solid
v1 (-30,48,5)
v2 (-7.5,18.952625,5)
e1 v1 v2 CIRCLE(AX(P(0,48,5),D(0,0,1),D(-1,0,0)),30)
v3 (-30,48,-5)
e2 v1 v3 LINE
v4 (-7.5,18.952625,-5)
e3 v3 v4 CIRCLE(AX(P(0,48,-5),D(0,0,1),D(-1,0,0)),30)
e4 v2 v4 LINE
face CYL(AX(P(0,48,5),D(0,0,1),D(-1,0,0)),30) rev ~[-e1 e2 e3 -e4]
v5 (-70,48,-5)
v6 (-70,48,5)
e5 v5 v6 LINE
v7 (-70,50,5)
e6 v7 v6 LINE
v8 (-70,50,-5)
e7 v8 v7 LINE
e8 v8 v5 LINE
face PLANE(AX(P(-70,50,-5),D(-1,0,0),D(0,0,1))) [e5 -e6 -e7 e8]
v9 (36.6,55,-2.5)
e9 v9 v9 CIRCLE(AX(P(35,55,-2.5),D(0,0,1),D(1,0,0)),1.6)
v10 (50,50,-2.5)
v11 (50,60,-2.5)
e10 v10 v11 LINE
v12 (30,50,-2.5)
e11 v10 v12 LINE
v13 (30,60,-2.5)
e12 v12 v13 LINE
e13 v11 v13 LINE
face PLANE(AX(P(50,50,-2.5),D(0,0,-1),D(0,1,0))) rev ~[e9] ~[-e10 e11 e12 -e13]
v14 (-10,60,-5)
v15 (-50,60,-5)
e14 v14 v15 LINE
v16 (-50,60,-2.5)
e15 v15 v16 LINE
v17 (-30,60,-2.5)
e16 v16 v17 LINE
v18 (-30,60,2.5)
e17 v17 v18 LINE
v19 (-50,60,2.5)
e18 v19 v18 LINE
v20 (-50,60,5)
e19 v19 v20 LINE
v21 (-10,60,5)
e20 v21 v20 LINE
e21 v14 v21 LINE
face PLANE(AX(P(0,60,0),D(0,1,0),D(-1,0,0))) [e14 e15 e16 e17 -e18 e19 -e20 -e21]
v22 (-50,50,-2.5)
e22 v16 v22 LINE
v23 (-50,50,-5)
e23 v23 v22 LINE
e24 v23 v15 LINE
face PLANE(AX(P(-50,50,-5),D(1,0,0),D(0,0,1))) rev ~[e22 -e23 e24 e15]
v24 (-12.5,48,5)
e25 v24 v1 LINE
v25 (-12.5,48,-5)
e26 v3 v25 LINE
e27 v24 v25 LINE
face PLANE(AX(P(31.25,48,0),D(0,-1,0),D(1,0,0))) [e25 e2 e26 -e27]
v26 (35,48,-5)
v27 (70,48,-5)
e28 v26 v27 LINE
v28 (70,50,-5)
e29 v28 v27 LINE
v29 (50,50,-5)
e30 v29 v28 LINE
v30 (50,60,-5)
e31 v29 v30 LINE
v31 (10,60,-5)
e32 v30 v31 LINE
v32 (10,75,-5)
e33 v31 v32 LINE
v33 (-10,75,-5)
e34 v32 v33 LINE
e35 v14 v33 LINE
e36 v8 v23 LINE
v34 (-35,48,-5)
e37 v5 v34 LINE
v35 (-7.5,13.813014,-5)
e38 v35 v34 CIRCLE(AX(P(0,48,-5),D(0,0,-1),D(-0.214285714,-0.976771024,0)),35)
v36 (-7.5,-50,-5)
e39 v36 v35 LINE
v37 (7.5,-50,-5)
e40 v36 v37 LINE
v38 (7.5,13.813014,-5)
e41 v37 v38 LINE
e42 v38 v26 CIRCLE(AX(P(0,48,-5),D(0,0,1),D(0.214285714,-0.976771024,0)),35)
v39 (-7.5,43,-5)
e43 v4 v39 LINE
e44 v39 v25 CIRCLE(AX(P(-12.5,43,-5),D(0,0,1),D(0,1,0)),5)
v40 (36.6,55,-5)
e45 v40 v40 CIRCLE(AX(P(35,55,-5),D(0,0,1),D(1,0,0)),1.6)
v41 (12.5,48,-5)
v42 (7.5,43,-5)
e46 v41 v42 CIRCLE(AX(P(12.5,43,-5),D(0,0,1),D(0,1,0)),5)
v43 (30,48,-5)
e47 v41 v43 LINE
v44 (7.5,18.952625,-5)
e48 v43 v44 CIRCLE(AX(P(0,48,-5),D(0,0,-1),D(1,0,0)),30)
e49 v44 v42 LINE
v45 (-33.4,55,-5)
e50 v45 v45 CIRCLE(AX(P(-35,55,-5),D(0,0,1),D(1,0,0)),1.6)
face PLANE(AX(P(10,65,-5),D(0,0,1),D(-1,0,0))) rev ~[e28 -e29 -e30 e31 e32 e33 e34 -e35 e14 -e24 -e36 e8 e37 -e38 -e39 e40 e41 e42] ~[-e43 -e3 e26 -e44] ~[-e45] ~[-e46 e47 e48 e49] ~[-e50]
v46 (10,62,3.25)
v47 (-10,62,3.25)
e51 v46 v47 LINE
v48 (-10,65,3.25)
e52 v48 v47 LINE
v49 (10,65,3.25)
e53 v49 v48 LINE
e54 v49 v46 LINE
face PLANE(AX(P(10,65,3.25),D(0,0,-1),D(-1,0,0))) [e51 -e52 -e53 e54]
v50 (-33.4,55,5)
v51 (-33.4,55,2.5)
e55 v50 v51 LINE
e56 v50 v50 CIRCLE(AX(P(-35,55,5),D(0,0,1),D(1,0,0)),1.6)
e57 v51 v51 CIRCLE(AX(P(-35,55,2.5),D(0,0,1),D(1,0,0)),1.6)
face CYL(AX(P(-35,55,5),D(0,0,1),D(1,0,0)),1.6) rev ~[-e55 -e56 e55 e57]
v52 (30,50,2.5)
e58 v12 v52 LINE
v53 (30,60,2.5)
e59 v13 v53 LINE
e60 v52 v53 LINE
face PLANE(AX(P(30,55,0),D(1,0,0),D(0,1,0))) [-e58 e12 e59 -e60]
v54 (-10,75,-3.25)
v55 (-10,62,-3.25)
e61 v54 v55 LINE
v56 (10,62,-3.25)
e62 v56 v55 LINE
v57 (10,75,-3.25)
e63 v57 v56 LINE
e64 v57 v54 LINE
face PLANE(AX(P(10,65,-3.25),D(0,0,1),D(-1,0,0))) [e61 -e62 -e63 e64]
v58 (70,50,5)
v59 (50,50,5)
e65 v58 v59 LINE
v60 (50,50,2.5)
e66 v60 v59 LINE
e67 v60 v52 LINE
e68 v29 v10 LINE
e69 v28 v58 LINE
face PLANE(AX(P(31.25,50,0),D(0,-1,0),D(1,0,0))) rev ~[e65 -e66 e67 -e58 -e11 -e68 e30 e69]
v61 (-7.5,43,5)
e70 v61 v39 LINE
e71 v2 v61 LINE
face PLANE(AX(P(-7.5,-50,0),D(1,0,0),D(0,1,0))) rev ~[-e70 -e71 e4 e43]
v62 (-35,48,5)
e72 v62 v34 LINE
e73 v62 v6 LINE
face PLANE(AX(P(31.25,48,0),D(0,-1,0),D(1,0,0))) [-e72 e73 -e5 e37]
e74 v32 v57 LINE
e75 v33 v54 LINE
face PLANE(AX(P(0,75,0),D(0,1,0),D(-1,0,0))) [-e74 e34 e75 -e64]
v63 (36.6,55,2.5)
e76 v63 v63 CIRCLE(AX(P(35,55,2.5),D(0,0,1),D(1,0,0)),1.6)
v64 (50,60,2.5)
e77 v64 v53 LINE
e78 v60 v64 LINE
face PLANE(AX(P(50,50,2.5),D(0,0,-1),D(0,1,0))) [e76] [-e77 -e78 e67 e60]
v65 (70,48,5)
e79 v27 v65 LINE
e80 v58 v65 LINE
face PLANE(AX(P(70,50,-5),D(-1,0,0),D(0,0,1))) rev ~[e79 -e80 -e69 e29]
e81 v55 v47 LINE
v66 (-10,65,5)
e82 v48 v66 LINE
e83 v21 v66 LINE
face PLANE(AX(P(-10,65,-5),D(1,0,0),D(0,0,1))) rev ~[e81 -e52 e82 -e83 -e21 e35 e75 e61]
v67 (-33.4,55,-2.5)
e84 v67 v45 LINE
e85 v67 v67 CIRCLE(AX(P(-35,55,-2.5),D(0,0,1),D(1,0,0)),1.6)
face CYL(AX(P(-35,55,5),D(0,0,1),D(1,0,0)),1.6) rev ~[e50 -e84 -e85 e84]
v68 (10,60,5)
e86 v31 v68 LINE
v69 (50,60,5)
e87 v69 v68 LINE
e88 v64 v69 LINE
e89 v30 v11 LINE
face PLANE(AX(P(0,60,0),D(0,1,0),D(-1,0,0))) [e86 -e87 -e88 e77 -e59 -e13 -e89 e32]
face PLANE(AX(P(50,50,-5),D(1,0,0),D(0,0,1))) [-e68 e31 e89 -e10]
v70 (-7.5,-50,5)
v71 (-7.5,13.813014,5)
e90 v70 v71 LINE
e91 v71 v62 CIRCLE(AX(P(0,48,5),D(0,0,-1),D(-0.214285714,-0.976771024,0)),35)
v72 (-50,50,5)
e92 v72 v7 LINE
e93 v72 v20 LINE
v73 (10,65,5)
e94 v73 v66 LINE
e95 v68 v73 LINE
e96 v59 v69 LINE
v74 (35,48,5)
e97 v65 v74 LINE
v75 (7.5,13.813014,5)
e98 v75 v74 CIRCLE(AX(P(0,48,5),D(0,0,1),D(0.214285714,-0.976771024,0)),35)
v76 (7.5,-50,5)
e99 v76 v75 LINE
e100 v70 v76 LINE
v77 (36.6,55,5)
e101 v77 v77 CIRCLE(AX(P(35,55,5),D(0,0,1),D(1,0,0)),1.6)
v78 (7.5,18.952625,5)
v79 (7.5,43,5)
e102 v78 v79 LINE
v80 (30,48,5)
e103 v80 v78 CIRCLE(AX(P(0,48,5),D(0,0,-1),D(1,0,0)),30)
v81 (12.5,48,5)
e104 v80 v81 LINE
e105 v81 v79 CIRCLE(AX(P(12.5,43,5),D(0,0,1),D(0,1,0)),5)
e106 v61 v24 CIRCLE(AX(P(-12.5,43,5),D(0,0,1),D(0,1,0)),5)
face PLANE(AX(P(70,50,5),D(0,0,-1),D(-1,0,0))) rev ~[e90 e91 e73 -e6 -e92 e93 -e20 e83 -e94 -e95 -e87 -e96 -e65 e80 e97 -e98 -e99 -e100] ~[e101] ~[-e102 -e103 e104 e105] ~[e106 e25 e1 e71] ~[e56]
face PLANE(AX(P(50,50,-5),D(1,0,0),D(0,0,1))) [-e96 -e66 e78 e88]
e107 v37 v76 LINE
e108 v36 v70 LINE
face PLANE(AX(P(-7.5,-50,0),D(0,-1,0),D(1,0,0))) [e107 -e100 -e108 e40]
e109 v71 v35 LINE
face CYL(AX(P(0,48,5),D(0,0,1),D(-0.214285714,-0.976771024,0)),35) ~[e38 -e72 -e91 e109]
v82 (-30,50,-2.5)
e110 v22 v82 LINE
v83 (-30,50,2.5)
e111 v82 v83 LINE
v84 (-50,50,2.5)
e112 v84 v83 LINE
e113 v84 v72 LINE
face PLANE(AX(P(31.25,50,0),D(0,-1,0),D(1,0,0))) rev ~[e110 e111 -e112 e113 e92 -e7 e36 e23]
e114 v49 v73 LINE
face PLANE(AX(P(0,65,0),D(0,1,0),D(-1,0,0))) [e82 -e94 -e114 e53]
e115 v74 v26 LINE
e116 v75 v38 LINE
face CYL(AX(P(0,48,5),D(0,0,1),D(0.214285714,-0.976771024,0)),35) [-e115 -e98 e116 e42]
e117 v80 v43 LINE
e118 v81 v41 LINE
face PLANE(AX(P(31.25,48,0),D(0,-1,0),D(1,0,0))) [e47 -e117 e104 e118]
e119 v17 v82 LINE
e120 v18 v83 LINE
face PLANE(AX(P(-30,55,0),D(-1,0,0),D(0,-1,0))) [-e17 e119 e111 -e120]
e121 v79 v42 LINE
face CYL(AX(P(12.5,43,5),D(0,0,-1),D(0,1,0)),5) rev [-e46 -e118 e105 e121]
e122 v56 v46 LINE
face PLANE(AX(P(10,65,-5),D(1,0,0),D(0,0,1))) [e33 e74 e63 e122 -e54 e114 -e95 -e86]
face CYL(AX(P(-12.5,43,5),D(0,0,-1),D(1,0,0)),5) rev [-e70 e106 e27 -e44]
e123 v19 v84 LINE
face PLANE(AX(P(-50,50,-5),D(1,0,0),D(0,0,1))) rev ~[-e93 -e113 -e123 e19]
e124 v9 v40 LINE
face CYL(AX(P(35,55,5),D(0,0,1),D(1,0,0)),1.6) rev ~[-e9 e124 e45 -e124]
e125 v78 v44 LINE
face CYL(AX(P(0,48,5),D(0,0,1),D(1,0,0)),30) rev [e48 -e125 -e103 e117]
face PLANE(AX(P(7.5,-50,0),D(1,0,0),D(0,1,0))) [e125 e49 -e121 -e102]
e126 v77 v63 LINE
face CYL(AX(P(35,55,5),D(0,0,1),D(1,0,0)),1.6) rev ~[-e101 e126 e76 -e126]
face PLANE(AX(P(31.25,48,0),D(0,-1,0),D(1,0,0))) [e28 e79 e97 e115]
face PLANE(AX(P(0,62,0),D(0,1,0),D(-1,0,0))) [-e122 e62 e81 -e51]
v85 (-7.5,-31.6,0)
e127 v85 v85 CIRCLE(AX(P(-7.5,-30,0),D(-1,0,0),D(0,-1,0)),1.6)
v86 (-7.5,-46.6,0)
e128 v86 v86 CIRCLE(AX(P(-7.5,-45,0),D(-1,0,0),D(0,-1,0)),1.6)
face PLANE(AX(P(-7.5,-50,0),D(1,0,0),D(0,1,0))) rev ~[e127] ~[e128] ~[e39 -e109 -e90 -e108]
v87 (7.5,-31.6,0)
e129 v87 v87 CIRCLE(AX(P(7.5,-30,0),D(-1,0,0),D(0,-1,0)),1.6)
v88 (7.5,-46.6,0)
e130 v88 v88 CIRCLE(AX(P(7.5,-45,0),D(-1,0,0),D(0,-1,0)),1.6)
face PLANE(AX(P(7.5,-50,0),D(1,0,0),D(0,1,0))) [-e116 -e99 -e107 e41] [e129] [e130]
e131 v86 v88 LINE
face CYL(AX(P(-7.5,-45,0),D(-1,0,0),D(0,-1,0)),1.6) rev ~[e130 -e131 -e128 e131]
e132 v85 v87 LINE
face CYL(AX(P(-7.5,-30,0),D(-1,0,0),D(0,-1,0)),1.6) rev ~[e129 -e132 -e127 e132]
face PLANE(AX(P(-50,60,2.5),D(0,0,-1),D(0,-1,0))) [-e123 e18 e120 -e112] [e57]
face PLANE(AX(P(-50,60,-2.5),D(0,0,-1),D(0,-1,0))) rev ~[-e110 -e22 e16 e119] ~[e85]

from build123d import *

# Parameters (mm, degrees)
F0_W      = 15
F0_H      = 100
F1_DEPTH  = 5
F2_W      = 100
F2_H      = 10
F3_DEPTH  = 10
F4_W      = 10
F4_H      = 5
F5_DEPTH  = 20
F6_W      = 10
F6_H      = 5
F7_DEPTH  = 20
F8_R      = 1.6
F9_DEPTH  = 10
F10_W     = 77.5
F10_H     = 10
F10_W_2   = 140
F11_DEPTH = 2
F12_R     = 5
F13_R     = 1.6
F14_DEPTH = 15
F15_W     = 20
F15_H     = 10
F16_DEPTH = 5
F17_W     = 20
F17_H     = 6.5
F18_DEPTH = 3
F19_DEPTH = 10
F21_DEPTH = 10


# Not quite as in the source:
# - a pattern or mirror of a feature is missing from the dataset's text; its kind, count and spacing are read off the source's solid


with BuildPart() as f1:
    # F0 (on Top) → F1 (new body, symmetric)
    with BuildSketch(Plane.XY):
        Rectangle(F0_W, F0_H)
    extrude(amount=F1_DEPTH, both=True)

    # F2 (on face) → F3 (join)
    with BuildSketch(Plane(origin=(0, 50, 0), x_dir=(-1, 0, 0), z_dir=(0, 1, 0))):
        Rectangle(F2_W, F2_H)
    extrude(amount=F3_DEPTH)

    # F4 (on face) → F5 (cut)
    with BuildSketch(Plane(origin=(-50, 0, 0), x_dir=(0, -1, 0), z_dir=(-1, 0, 0))):
        with Locations((-55, 0)):
            Rectangle(F4_W, F4_H)
    extrude(amount=-F5_DEPTH, mode=Mode.SUBTRACT)

    # F6 (on face) → F7 (cut)
    with BuildSketch(Plane.YZ.offset(50)):
        with Locations((55, 0)):
            Rectangle(F6_W, F6_H)
    extrude(amount=-F7_DEPTH, mode=Mode.SUBTRACT)

    # F8 (on face) → F9 (cut, through all)
    with BuildSketch(Plane.XY.offset(5)):
        with Locations((-35, 55)):
            Circle(F8_R)
        with Locations((35, 55)):
            Circle(F8_R)
    extrude(amount=-F9_DEPTH, mode=Mode.SUBTRACT)

    # F10 (on face) → F11 (join)
    with BuildSketch(Plane.XZ.offset(-50)):
        with Locations((31.25, 0)):
            Rectangle(F10_W, F10_H)
        Rectangle(F10_W_2, F10_H)
    extrude(amount=F11_DEPTH)

    # F12
    f12_edges = [f1.edges().sort_by_distance(p)[0] for p in [
        (-7.5, 48, 0),
        (7.5, 48, 0),
    ]]
    fillet(f12_edges, radius=F12_R)

    # F13 (on face) → F14 (cut, through all)
    with BuildSketch(Plane(origin=(-7.5, 0, 0), x_dir=(0, -1, 0), z_dir=(-1, 0, 0))):
        with Locations((30, 0)):
            Circle(F13_R)
        with Locations((45, 0)):
            Circle(F13_R)
    extrude(amount=-F14_DEPTH, mode=Mode.SUBTRACT)

    # F15 (on face) → F16 (join)
    with BuildSketch(Plane(origin=(0, 60, 0), x_dir=(-1, 0, 0), z_dir=(0, 1, 0))):
        Rectangle(F15_W, F15_H)
    extrude(amount=F16_DEPTH)

    # F17 (on face) → F18 (cut)
    with BuildSketch(Plane(origin=(0, 65, 0), x_dir=(-1, 0, 0), z_dir=(0, 1, 0))):
        Rectangle(F17_W, F17_H)
    extrude(amount=-F18_DEPTH, mode=Mode.SUBTRACT)

    # F19 (add): a face of the model
    f19_faces = [f1.faces().sort_by_distance(p)[0] for p in [
        (0, 65, -4.125),
    ]]
    extrude(f19_faces, amount=F19_DEPTH)

    # F20 (on face) → F21 (join, through all)
    with BuildSketch(Plane.XY.offset(5)):
        with BuildLine():
            Line((35, 48), (30, 48))
            ThreePointArc((30, 48), (23.7170824513, 29.6288269291), (7.5, 18.9526249034))
            Line((7.5, 18.9526249034), (7.5, 13.8130141721))
            ThreePointArc((7.5, 13.8130141721), (27.2717802866, 26.0625890315), (35, 48))
        make_face()
    f21 = extrude(amount=-F21_DEPTH)

    # F21_copies: F21 across plane
    add(f21.mirror(Plane(origin=(0, 0, 0), x_dir=(0, 0, -1), z_dir=(-1, 0, 0))))


solid = f1.part
